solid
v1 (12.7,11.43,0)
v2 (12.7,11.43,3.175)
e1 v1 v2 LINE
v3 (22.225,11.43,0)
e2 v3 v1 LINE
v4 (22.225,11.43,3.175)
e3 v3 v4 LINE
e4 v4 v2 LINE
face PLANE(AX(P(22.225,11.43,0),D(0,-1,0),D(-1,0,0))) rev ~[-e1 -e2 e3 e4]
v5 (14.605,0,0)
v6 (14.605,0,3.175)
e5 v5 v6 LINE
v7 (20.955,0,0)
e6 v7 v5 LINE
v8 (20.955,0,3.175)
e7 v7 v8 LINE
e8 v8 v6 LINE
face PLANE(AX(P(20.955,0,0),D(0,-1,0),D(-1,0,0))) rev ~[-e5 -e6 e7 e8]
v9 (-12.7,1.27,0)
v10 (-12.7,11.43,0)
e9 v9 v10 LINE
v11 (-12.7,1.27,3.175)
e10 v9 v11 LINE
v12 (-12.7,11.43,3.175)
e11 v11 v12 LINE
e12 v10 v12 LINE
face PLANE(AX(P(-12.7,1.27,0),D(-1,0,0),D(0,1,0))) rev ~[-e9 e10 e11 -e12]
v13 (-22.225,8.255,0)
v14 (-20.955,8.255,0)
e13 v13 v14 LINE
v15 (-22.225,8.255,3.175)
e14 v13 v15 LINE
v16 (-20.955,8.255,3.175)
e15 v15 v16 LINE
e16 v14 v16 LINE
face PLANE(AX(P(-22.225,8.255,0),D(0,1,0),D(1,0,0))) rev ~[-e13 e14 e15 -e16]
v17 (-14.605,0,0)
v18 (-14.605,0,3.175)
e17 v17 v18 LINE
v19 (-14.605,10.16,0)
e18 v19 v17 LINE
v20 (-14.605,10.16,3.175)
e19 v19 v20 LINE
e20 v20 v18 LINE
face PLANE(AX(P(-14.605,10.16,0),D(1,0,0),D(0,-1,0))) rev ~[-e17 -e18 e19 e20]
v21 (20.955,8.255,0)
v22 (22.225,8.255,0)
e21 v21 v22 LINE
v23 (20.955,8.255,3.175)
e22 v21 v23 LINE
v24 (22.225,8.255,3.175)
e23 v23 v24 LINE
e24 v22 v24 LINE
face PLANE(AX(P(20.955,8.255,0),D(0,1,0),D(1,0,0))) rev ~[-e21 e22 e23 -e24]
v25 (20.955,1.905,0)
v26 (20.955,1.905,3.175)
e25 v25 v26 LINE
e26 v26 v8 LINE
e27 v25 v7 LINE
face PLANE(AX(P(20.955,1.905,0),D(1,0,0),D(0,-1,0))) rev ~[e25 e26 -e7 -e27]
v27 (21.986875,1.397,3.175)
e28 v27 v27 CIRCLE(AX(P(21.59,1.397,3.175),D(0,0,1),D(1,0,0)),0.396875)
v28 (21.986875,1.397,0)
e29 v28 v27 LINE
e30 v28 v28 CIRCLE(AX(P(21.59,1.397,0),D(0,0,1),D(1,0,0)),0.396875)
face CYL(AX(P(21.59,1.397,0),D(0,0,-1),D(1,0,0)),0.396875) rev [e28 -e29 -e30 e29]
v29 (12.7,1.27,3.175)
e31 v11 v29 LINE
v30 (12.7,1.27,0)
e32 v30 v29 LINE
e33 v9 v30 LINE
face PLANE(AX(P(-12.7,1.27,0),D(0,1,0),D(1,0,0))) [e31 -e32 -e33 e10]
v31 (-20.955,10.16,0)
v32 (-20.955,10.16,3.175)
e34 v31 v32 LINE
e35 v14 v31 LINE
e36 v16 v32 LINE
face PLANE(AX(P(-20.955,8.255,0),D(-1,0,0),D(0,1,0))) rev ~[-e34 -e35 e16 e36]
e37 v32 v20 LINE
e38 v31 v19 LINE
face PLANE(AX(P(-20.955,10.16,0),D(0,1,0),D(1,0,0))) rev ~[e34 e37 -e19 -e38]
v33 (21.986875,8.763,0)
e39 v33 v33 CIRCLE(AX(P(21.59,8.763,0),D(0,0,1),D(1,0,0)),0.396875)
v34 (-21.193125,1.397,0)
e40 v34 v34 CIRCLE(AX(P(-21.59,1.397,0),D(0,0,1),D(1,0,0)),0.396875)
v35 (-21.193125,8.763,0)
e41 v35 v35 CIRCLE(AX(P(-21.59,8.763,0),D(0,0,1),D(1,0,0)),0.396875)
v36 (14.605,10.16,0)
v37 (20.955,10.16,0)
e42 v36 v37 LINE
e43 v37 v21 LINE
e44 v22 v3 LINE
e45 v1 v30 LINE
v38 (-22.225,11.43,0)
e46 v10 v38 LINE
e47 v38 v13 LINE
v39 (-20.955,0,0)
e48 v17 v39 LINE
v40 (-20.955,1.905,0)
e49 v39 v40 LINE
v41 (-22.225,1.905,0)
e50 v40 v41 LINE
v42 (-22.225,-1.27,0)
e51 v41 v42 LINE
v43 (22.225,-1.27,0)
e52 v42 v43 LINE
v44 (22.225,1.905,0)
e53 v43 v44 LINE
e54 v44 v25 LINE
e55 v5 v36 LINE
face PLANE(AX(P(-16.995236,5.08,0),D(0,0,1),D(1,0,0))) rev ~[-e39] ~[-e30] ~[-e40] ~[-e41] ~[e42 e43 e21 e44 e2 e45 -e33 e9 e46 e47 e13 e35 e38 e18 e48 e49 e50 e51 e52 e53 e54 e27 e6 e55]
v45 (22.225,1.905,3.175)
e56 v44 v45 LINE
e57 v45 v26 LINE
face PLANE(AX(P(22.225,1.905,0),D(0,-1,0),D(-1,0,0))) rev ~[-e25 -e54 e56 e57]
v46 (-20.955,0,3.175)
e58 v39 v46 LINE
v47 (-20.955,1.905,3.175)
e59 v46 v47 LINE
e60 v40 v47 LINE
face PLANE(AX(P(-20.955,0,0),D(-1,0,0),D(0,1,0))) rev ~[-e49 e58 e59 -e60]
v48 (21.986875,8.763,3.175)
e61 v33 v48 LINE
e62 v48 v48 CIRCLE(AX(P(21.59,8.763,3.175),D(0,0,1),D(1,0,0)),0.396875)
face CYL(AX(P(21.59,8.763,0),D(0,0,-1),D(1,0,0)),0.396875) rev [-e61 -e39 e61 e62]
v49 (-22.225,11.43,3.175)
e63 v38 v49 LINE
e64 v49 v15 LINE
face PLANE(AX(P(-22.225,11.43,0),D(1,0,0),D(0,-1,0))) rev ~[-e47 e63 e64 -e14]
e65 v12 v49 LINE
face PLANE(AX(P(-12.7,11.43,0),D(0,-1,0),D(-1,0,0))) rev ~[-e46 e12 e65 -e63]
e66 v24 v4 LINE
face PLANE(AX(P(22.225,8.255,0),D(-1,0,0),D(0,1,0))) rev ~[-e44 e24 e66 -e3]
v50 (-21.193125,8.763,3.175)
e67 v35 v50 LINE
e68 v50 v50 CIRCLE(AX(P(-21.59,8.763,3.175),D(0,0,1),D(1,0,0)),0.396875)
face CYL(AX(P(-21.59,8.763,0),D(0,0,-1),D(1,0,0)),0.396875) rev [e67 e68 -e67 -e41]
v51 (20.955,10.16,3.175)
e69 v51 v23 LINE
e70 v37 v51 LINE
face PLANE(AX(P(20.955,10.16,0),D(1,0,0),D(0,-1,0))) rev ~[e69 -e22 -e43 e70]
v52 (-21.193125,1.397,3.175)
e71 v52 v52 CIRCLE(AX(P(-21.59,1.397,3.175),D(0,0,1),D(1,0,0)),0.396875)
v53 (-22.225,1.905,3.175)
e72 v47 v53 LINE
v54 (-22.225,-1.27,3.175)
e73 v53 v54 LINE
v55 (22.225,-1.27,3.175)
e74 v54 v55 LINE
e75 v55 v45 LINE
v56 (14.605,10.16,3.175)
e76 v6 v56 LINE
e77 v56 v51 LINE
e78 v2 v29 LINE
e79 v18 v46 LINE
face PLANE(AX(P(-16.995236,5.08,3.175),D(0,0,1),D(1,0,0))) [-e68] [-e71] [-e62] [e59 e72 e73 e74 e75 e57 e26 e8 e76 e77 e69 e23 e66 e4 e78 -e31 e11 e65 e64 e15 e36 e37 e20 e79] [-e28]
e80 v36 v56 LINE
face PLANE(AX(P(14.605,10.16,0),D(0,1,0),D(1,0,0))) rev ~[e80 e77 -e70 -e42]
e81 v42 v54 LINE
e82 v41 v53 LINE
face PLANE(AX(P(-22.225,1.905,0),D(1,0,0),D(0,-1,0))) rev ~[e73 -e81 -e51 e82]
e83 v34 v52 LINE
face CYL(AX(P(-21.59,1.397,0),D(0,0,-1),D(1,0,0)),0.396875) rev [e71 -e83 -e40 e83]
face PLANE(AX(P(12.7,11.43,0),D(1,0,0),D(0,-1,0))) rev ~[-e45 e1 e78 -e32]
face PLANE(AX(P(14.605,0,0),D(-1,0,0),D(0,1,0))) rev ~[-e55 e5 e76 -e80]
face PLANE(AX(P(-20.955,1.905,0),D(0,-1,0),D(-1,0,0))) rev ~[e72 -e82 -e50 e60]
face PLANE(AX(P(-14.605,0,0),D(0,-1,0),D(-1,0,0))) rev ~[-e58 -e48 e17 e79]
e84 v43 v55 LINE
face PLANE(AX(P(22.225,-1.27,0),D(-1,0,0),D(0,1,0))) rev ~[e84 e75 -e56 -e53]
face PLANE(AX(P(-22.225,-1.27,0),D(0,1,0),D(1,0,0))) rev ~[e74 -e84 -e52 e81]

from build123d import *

# Parameters (mm, degrees)
F0_R     = 0.396875
F0_W     = 25.4
F0_H     = 2.54
F1_DEPTH = 3.175


# Not quite as in the source:
# - a feature names something its author has since deleted; it is built from what else it names


with BuildPart() as f1:
    # F0 (on Top) → F1 (new body)
    with BuildSketch(Plane.XY):
        Polygon((-12.7, 11.43), (-22.225, 11.43), (-22.225, 8.255), (-20.955, 8.255), (-20.955, 10.16), (-14.605, 10.16), (-14.605, 0), (-20.955, 0), (-20.955, 1.905), (-22.225, 1.905), (-22.225, -1.27), (-12.7, -1.27), (-12.7, 1.27), align=None)
        with Locations((-21.59, 1.397)):
            Circle(F0_R, mode=Mode.SUBTRACT)
        with Locations((-21.59, 8.763)):
            Circle(F0_R, mode=Mode.SUBTRACT)
        Rectangle(F0_W, F0_H)
        Polygon((12.7, 11.43), (12.7, 1.27), (12.7, -1.27), (22.225, -1.27), (22.225, 1.905), (20.955, 1.905), (20.955, 0), (14.605, 0), (14.605, 10.16), (20.955, 10.16), (20.955, 8.255), (22.225, 8.255), (22.225, 11.43), align=None)
        with Locations((21.59, 1.397)):
            Circle(F0_R, mode=Mode.SUBTRACT)
        with Locations((21.59, 8.763)):
            Circle(F0_R, mode=Mode.SUBTRACT)
    extrude(amount=F1_DEPTH)


solid = f1.part
